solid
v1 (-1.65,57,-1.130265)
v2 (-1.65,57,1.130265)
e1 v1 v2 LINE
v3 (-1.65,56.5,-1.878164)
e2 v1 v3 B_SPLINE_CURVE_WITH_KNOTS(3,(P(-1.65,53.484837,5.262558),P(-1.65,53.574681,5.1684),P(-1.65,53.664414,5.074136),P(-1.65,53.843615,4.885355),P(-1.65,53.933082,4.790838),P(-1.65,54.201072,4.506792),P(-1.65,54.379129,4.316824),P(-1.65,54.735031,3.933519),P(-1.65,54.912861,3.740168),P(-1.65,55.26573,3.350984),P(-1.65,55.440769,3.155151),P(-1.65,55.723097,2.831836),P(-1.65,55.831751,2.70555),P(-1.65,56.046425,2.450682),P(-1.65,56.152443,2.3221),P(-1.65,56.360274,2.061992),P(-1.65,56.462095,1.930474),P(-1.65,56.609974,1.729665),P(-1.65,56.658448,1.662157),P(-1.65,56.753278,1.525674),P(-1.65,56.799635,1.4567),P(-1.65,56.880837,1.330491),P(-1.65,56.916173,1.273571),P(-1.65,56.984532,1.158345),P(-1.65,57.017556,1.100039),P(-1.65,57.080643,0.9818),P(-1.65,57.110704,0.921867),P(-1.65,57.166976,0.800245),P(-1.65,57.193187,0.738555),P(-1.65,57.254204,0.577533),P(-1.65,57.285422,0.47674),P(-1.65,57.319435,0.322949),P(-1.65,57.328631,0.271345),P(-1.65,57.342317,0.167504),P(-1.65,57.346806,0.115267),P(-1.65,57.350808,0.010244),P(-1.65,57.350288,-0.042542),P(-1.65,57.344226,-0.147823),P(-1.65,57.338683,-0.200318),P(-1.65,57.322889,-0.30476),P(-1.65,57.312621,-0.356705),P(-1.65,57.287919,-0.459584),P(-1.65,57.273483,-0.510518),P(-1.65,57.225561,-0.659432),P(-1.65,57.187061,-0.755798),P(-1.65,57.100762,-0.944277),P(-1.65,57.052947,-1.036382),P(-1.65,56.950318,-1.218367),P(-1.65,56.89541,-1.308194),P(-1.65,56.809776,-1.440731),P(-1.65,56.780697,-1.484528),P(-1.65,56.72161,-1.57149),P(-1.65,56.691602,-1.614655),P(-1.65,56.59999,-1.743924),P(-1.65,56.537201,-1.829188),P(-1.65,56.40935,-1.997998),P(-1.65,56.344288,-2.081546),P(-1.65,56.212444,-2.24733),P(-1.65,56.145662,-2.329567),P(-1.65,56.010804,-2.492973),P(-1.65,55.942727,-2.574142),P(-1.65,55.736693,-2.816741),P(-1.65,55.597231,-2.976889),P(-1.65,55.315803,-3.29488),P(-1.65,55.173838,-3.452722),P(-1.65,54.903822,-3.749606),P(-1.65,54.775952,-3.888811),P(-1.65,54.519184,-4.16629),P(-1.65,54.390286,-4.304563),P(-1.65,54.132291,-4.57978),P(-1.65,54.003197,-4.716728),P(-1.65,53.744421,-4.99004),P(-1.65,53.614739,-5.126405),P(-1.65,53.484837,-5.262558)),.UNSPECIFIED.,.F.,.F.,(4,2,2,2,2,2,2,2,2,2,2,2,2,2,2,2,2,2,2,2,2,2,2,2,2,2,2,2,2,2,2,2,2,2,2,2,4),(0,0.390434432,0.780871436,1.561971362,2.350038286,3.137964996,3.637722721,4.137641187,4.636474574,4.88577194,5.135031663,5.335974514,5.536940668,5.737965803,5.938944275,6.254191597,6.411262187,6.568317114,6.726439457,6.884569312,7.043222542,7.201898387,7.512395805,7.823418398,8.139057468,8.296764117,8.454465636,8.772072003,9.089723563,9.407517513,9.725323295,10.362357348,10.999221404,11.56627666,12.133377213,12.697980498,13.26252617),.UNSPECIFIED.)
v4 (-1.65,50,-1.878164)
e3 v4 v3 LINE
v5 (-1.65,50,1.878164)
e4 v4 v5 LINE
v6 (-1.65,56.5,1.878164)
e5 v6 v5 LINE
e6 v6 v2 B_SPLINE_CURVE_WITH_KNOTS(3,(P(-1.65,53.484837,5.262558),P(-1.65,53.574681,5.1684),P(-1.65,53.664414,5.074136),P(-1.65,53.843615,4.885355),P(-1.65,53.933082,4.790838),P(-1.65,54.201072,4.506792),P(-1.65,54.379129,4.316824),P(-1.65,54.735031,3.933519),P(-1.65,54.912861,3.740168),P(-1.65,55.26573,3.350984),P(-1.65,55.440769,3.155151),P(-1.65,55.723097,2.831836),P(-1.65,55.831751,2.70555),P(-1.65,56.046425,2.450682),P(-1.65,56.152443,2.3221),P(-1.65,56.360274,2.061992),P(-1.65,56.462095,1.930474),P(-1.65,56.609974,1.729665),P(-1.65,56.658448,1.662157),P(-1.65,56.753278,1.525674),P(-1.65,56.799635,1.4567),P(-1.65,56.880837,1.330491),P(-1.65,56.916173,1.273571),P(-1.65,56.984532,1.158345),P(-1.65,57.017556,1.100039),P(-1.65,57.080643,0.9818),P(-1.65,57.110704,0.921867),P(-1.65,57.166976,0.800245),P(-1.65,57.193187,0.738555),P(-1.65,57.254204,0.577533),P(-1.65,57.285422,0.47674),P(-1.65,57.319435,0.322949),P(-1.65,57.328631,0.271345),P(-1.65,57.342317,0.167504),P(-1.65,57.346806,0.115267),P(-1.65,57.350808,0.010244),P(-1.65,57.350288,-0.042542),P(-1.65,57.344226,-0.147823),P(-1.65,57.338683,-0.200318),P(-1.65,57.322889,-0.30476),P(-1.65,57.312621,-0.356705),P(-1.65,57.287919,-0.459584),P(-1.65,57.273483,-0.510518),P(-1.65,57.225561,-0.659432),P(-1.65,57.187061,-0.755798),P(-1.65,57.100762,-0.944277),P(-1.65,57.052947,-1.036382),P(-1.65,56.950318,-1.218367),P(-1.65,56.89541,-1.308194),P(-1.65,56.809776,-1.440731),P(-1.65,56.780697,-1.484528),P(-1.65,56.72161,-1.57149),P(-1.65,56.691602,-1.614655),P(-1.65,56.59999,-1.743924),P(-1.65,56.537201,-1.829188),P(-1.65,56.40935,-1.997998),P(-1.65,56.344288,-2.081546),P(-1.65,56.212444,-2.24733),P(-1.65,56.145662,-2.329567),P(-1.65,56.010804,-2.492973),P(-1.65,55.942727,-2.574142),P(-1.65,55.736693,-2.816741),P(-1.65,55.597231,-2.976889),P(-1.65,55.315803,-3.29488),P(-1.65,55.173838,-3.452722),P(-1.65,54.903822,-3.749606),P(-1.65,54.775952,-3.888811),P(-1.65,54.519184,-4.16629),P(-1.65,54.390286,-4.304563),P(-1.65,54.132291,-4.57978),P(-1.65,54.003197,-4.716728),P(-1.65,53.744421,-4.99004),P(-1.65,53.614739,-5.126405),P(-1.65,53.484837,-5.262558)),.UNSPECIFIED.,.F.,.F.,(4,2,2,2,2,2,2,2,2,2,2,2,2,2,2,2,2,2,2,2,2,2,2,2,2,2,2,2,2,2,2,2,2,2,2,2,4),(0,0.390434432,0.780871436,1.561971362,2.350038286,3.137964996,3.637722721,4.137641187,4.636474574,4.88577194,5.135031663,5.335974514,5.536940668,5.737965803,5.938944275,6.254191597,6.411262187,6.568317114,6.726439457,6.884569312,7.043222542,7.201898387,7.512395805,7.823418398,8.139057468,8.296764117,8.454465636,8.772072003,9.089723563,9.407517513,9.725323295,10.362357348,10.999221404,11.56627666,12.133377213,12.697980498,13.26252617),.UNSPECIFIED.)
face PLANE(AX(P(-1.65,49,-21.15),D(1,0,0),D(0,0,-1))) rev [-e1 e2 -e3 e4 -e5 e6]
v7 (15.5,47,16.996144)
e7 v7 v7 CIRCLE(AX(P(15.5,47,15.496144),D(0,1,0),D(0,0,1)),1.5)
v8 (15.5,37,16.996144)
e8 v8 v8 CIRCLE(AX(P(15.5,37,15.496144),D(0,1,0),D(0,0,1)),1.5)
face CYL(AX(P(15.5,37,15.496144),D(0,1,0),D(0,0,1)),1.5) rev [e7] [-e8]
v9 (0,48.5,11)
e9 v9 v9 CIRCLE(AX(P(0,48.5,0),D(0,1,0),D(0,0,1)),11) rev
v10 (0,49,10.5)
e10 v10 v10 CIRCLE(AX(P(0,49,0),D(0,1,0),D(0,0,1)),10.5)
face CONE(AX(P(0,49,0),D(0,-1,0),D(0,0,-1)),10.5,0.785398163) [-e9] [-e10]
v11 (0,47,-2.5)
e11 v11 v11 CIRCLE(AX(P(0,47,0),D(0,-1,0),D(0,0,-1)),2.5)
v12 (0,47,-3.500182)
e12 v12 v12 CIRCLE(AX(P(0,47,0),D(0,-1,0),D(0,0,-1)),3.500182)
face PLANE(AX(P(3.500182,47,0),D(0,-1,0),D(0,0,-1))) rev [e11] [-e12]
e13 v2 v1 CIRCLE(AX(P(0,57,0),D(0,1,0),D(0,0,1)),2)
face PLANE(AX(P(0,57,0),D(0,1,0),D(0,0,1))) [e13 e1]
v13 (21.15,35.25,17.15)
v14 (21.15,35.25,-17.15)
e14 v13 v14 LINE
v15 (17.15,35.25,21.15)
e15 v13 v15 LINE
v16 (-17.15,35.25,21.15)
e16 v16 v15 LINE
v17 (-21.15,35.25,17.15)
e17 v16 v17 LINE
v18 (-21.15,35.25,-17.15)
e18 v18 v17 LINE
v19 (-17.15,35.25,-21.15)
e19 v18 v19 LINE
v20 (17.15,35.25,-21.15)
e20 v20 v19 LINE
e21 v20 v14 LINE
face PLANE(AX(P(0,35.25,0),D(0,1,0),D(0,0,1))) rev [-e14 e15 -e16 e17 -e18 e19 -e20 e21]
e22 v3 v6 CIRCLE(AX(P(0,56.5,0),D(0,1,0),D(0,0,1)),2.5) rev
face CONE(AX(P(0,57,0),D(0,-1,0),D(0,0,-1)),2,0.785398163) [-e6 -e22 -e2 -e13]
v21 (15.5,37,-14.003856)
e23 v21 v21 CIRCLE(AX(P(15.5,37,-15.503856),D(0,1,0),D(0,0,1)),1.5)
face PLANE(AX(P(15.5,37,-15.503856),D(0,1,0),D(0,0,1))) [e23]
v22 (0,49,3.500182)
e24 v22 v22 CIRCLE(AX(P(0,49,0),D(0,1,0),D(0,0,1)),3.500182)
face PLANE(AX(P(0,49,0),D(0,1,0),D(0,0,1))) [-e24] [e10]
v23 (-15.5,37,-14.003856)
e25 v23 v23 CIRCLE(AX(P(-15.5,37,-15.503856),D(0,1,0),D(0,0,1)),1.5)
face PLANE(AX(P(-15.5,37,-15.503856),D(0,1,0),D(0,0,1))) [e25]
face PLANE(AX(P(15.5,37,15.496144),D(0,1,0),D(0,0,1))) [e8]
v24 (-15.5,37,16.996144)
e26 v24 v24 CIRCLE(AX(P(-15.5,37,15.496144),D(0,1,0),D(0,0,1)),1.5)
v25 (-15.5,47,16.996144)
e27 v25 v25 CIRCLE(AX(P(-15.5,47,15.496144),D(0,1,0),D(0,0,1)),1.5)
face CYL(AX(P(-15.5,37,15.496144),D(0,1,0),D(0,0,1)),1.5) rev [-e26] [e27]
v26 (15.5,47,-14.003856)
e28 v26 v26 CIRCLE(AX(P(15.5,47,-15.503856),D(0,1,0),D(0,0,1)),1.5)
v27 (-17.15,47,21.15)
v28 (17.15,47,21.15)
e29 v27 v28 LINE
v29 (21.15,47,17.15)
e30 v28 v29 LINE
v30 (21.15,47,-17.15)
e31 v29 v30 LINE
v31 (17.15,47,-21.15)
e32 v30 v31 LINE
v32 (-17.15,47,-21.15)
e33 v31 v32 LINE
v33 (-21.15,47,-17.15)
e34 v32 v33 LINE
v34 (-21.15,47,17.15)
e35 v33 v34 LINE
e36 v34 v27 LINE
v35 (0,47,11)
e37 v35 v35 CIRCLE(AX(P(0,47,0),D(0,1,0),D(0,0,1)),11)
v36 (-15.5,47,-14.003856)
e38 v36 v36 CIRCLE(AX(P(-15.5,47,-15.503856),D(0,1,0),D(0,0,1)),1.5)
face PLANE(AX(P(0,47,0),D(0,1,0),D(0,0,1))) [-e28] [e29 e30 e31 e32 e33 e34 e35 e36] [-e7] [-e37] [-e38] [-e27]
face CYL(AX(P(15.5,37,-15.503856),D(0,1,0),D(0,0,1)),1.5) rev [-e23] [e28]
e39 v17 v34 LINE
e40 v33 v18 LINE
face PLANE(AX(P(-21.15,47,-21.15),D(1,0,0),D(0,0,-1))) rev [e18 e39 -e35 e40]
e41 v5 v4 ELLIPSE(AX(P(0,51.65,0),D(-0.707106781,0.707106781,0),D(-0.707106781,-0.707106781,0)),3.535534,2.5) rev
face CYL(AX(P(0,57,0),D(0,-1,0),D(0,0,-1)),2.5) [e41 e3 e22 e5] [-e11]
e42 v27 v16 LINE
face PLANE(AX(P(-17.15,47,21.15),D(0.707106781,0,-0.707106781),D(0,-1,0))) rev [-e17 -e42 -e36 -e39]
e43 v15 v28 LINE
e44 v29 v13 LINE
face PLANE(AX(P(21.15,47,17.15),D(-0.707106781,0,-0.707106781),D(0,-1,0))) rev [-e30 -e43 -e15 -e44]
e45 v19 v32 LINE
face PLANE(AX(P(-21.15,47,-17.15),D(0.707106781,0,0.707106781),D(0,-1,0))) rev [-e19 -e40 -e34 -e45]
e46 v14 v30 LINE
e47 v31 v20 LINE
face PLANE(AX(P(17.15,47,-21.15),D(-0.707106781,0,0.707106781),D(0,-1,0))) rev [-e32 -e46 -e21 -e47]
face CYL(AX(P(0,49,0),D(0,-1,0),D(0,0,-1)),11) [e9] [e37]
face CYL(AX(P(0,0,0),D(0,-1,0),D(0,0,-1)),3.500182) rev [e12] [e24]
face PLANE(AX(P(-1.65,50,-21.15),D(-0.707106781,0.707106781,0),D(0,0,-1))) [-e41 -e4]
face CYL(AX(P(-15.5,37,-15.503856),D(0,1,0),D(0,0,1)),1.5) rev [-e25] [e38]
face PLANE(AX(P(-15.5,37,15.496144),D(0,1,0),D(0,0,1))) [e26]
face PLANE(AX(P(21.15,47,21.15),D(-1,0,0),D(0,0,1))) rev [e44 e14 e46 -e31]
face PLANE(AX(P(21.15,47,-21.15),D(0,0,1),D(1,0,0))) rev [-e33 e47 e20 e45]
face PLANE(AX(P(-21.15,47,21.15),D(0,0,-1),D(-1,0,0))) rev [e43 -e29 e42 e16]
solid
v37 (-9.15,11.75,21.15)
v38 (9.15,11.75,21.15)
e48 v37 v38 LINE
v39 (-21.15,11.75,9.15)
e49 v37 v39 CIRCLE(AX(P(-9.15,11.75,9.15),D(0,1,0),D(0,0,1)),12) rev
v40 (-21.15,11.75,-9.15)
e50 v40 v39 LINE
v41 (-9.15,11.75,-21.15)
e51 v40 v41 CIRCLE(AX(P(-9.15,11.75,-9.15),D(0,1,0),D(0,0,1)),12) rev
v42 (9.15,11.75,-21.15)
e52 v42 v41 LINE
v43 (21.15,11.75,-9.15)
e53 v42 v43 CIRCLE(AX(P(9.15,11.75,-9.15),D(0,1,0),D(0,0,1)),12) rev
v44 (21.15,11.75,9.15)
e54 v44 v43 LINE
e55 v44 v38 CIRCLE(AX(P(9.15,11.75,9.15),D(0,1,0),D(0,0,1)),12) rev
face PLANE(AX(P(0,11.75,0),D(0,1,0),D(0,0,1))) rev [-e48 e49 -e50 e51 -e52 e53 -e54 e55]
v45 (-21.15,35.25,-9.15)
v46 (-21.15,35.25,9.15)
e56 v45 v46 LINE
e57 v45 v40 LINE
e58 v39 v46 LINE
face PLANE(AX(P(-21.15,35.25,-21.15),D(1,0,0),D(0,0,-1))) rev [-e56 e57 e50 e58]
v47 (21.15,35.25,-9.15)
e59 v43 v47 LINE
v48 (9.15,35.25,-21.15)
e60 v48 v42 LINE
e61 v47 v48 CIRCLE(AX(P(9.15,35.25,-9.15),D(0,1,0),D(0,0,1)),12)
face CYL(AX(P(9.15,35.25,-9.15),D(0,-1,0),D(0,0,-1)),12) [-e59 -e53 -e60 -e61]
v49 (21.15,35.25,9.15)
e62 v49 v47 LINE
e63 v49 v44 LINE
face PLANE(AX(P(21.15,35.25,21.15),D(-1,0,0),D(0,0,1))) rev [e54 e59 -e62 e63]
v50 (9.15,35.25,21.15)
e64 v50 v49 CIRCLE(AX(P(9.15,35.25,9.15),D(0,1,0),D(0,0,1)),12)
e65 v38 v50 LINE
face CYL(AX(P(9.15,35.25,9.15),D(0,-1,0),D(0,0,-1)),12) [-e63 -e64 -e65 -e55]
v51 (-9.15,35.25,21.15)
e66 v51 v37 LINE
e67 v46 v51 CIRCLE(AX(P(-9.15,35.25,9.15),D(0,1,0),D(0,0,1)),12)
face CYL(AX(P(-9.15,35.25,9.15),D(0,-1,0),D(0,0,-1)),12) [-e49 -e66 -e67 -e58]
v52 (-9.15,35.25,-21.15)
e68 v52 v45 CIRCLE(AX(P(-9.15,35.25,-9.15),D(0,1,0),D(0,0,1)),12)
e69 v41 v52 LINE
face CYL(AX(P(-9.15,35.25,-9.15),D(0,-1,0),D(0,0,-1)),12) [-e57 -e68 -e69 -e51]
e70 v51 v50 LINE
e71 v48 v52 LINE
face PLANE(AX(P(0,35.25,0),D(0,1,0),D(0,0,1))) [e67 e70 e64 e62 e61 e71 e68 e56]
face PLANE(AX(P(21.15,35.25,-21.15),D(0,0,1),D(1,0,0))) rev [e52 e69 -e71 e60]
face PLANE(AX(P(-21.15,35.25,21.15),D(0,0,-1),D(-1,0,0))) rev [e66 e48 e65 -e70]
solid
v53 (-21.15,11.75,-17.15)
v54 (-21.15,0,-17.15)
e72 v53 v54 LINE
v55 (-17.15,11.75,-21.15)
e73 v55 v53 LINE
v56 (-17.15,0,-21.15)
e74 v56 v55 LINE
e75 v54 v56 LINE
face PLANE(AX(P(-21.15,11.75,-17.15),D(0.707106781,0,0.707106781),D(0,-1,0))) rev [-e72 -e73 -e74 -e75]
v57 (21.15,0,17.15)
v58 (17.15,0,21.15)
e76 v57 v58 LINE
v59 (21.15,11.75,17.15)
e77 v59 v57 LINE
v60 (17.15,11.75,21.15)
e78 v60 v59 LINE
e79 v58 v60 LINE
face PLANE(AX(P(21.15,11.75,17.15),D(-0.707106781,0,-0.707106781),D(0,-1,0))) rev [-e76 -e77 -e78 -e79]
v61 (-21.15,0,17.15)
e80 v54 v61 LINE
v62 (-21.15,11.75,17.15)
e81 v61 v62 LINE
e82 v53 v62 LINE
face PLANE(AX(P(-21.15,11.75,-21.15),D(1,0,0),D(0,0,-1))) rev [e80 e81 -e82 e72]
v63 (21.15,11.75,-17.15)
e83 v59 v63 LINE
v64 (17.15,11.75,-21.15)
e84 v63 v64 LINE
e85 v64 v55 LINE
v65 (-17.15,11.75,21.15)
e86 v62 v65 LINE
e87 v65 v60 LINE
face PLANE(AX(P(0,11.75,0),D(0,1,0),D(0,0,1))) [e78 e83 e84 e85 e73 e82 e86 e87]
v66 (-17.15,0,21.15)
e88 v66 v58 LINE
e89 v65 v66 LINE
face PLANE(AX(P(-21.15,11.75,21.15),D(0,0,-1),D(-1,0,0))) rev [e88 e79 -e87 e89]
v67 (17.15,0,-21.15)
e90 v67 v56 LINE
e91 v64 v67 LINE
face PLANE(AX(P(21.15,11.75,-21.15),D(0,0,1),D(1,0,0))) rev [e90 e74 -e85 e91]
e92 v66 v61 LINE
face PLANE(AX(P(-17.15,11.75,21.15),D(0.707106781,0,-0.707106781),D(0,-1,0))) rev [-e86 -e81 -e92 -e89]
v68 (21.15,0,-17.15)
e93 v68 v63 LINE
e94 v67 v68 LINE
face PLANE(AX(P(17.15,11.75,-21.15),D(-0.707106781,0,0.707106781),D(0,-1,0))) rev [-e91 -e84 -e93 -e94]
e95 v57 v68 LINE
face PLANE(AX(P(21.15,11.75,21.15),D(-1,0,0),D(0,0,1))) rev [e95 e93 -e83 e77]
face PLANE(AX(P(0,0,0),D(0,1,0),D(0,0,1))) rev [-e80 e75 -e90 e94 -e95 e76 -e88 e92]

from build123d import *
from build123d.topology import SkipClean

# Parameters (mm, degrees)
SKETCH1_W               = 42.3
SKETCH1_H               = 42.3
BOSS_EXTRUDE1_DEPTH     = 11.75
SKETCH2_W               = 42.3
SKETCH2_H               = 42.3
BOSS_EXTRUDE2_DEPTH     = 23.5
FILLET2_R               = 12
SKETCH4_W               = 42.3
SKETCH4_H               = 42.3
BOSS_EXTRUDE3_DEPTH     = 11.75
SKETCH6_W               = 42.3
SKETCH6_H               = 42.3
BOSS_EXTRUDE4_DEPTH     = 11.75
CHAMFER3_SIZE           = 4
CHAMFER4_SIZE           = 4
SKETCH7_R               = 11
BOSS_EXTRUDE5_DEPTH     = 2
SKETCH8_R               = 2.5
BOSS_EXTRUDE6_DEPTH     = 10
CHAMFER5_SIZE           = 0.5
CHAMFER9_SIZE           = 0.5
SKETCH15_W              = 1.000182245
SKETCH15_H              = 2.5
SKETCH18_R              = 1.5
CUT_EXTRUDE4_DEPTH      = 10
CUT_EXTRUDE5_DEPTH      = 65.37115037
CUT_EXTRUDE5_DEPTH_BACK = 65.37115037
CHAMFER11_SIZE          = 1


with BuildPart() as part:
    # Sketch1 → Boss-Extrude1 (new body)
    with BuildSketch(Plane(origin=(0, 0, 0), x_dir=(1, 0, 0), z_dir=(0, 1, 0))):
        Rectangle(SKETCH1_W, SKETCH1_H)
    extrude(amount=BOSS_EXTRUDE1_DEPTH)

    # Sketch4 → Boss-Extrude3 (add)
    with BuildSketch(Plane(origin=(0, 0, 0), x_dir=(1, 0, 0), z_dir=(0, 1, 0))):
        Rectangle(SKETCH4_W, SKETCH4_H)
    extrude(amount=BOSS_EXTRUDE3_DEPTH)

    # Chamfer3
    chamfer3_edges = [part.edges().sort_by_distance(p)[0] for p in [
        (21.15, 5.875, -21.15),
        (21.15, 5.875, 21.15),
        (-21.15, 5.875, 21.15),
        (-21.15, 5.875, -21.15),
    ]]
    chamfer(chamfer3_edges, length=CHAMFER3_SIZE)


with BuildPart() as body_2:
    # Sketch2 → Boss-Extrude2 (new body)
    with BuildSketch(Plane(origin=(0, 11.75, 0), x_dir=(1, 0, 0), z_dir=(0, 1, 0))):
        Rectangle(SKETCH2_W, SKETCH2_H)
    extrude(amount=BOSS_EXTRUDE2_DEPTH)

    # Fillet2
    fillet2_edges = [body_2.edges().sort_by_distance(p)[0] for p in [
        (21.15, 23.5, -21.15),
        (21.15, 23.5, 21.15),
        (-21.15, 23.5, 21.15),
        (-21.15, 23.5, -21.15),
    ]]
    fillet(fillet2_edges, radius=FILLET2_R)


with BuildPart() as body_3:
    # Sketch6 → Boss-Extrude4 (new body)
    with BuildSketch(Plane(origin=(0, 35.25, 0), x_dir=(1, 0, 0), z_dir=(0, 1, 0))):
        Rectangle(SKETCH6_W, SKETCH6_H)
    extrude(amount=BOSS_EXTRUDE4_DEPTH)

    # Chamfer4
    chamfer4_edges = [body_3.edges().sort_by_distance(p)[0] for p in [
        (21.15, 41.125, -21.15),
        (21.15, 41.125, 21.15),
        (-21.15, 41.125, 21.15),
        (-21.15, 41.125, -21.15),
    ]]
    chamfer(chamfer4_edges, length=CHAMFER4_SIZE)

    # Sketch7 → Boss-Extrude5 (add)
    with BuildSketch(Plane(origin=(0, 47, 0), x_dir=(1, 0, 0), z_dir=(0, 1, 0))):
        with Locations(Location((0, 0, 0), (0, 0, 270))):
            Circle(SKETCH7_R)
    extrude(amount=BOSS_EXTRUDE5_DEPTH)

    # Sketch8 → Boss-Extrude6 (add)
    with BuildSketch(Plane(origin=(0, 47, 0), x_dir=(1, 0, 0), z_dir=(0, 1, 0))):
        with Locations(Location((0, 0, 0), (0, 0, 270))):
            Circle(SKETCH8_R)
    extrude(amount=BOSS_EXTRUDE6_DEPTH)

    # Chamfer5
    chamfer5_edges = [body_3.edges().sort_by_distance(p)[0] for p in [
        (0, 57, -2.5),
    ]]
    chamfer(chamfer5_edges, length=CHAMFER5_SIZE)

    # Chamfer9
    chamfer9_edges = [body_3.edges().sort_by_distance(p)[0] for p in [
        (0, 49, -11),
    ]]
    chamfer(chamfer9_edges, length=CHAMFER9_SIZE)

    # Sketch15 → Cut-Revolve1 (revolve, cut)
    with SkipClean():  # the faces are left unmerged after this step: merging them gives an invalid solid
        with BuildSketch(Plane.XY, mode=Mode.PRIVATE) as cut_revolve1_sk:
            with Locations((3.000091123, 48.25)):
                Rectangle(SKETCH15_W, SKETCH15_H)
        revolve(cut_revolve1_sk.sketch.rotate(Axis((0, 0, 0), (0, 1, 0)), 90), axis=Axis((0, 0, 0), (0, 1, 0)), mode=Mode.SUBTRACT)

    # Sketch18 → Cut-Extrude4 (cut)
    with SkipClean():  # the faces are left unmerged after this step: merging them gives an invalid solid
        with BuildSketch(Plane(origin=(0, 47, 0), x_dir=(1, 0, 0), z_dir=(0, 1, 0))):
            with Locations(Location((15.5, 15.503856364, 0), (0, 0, 270))):
                Circle(SKETCH18_R)
            with Locations(Location((15.5, -15.496143636, 0), (0, 0, 270))):
                Circle(SKETCH18_R)
            with Locations(Location((-15.5, -15.496143636, 0), (0, 0, 270))):
                Circle(SKETCH18_R)
            with Locations(Location((-15.5, 15.503856364, 0), (0, 0, 270))):
                Circle(SKETCH18_R)
        extrude(amount=-CUT_EXTRUDE4_DEPTH, mode=Mode.SUBTRACT)

    # Sketch19 → Cut-Extrude5 (cut, two sides: drawn at the far end of the back side and taken through both)
    with BuildSketch(Plane.XY.offset(-CUT_EXTRUDE5_DEPTH_BACK)):
        Polygon((-2.5, 56.5), (-2.5, 49), (-1.65, 49), (-1.65, 57), (-2, 57), align=None)
    extrude(amount=CUT_EXTRUDE5_DEPTH + CUT_EXTRUDE5_DEPTH_BACK, mode=Mode.SUBTRACT)

    # Chamfer11
    # the kernel refuses this chamfer: 1 mm, written as the material it adds along each edge
    with BuildSketch(Plane(origin=(-1.65, 49, -4.449846985), x_dir=(0.0274958766105862, 0.9996219169112968, 0), z_dir=(0, 0, 1))) as chamfer11_piece_1_section:
        Polygon((CHAMFER11_SIZE * 0.999621916911, CHAMFER11_SIZE * 0.0274958766106), (-CHAMFER11_SIZE * 0.0274958766106, CHAMFER11_SIZE * 0.999621916911), (0, 0), align=None)
    chamfer11_piece_1 = extrude(amount=8.89969397, mode=Mode.PRIVATE)
    chamfer11_piece_1 = chamfer11_piece_1 & Plane(origin=(0, 49.369319322, 0), x_dir=(0, 0, -1), z_dir=(0, 1, 0)) * Cylinder(2.5, 22, mode=Mode.PRIVATE)
    add(chamfer11_piece_1)


solid = Compound([part.part, body_2.part, body_3.part])
